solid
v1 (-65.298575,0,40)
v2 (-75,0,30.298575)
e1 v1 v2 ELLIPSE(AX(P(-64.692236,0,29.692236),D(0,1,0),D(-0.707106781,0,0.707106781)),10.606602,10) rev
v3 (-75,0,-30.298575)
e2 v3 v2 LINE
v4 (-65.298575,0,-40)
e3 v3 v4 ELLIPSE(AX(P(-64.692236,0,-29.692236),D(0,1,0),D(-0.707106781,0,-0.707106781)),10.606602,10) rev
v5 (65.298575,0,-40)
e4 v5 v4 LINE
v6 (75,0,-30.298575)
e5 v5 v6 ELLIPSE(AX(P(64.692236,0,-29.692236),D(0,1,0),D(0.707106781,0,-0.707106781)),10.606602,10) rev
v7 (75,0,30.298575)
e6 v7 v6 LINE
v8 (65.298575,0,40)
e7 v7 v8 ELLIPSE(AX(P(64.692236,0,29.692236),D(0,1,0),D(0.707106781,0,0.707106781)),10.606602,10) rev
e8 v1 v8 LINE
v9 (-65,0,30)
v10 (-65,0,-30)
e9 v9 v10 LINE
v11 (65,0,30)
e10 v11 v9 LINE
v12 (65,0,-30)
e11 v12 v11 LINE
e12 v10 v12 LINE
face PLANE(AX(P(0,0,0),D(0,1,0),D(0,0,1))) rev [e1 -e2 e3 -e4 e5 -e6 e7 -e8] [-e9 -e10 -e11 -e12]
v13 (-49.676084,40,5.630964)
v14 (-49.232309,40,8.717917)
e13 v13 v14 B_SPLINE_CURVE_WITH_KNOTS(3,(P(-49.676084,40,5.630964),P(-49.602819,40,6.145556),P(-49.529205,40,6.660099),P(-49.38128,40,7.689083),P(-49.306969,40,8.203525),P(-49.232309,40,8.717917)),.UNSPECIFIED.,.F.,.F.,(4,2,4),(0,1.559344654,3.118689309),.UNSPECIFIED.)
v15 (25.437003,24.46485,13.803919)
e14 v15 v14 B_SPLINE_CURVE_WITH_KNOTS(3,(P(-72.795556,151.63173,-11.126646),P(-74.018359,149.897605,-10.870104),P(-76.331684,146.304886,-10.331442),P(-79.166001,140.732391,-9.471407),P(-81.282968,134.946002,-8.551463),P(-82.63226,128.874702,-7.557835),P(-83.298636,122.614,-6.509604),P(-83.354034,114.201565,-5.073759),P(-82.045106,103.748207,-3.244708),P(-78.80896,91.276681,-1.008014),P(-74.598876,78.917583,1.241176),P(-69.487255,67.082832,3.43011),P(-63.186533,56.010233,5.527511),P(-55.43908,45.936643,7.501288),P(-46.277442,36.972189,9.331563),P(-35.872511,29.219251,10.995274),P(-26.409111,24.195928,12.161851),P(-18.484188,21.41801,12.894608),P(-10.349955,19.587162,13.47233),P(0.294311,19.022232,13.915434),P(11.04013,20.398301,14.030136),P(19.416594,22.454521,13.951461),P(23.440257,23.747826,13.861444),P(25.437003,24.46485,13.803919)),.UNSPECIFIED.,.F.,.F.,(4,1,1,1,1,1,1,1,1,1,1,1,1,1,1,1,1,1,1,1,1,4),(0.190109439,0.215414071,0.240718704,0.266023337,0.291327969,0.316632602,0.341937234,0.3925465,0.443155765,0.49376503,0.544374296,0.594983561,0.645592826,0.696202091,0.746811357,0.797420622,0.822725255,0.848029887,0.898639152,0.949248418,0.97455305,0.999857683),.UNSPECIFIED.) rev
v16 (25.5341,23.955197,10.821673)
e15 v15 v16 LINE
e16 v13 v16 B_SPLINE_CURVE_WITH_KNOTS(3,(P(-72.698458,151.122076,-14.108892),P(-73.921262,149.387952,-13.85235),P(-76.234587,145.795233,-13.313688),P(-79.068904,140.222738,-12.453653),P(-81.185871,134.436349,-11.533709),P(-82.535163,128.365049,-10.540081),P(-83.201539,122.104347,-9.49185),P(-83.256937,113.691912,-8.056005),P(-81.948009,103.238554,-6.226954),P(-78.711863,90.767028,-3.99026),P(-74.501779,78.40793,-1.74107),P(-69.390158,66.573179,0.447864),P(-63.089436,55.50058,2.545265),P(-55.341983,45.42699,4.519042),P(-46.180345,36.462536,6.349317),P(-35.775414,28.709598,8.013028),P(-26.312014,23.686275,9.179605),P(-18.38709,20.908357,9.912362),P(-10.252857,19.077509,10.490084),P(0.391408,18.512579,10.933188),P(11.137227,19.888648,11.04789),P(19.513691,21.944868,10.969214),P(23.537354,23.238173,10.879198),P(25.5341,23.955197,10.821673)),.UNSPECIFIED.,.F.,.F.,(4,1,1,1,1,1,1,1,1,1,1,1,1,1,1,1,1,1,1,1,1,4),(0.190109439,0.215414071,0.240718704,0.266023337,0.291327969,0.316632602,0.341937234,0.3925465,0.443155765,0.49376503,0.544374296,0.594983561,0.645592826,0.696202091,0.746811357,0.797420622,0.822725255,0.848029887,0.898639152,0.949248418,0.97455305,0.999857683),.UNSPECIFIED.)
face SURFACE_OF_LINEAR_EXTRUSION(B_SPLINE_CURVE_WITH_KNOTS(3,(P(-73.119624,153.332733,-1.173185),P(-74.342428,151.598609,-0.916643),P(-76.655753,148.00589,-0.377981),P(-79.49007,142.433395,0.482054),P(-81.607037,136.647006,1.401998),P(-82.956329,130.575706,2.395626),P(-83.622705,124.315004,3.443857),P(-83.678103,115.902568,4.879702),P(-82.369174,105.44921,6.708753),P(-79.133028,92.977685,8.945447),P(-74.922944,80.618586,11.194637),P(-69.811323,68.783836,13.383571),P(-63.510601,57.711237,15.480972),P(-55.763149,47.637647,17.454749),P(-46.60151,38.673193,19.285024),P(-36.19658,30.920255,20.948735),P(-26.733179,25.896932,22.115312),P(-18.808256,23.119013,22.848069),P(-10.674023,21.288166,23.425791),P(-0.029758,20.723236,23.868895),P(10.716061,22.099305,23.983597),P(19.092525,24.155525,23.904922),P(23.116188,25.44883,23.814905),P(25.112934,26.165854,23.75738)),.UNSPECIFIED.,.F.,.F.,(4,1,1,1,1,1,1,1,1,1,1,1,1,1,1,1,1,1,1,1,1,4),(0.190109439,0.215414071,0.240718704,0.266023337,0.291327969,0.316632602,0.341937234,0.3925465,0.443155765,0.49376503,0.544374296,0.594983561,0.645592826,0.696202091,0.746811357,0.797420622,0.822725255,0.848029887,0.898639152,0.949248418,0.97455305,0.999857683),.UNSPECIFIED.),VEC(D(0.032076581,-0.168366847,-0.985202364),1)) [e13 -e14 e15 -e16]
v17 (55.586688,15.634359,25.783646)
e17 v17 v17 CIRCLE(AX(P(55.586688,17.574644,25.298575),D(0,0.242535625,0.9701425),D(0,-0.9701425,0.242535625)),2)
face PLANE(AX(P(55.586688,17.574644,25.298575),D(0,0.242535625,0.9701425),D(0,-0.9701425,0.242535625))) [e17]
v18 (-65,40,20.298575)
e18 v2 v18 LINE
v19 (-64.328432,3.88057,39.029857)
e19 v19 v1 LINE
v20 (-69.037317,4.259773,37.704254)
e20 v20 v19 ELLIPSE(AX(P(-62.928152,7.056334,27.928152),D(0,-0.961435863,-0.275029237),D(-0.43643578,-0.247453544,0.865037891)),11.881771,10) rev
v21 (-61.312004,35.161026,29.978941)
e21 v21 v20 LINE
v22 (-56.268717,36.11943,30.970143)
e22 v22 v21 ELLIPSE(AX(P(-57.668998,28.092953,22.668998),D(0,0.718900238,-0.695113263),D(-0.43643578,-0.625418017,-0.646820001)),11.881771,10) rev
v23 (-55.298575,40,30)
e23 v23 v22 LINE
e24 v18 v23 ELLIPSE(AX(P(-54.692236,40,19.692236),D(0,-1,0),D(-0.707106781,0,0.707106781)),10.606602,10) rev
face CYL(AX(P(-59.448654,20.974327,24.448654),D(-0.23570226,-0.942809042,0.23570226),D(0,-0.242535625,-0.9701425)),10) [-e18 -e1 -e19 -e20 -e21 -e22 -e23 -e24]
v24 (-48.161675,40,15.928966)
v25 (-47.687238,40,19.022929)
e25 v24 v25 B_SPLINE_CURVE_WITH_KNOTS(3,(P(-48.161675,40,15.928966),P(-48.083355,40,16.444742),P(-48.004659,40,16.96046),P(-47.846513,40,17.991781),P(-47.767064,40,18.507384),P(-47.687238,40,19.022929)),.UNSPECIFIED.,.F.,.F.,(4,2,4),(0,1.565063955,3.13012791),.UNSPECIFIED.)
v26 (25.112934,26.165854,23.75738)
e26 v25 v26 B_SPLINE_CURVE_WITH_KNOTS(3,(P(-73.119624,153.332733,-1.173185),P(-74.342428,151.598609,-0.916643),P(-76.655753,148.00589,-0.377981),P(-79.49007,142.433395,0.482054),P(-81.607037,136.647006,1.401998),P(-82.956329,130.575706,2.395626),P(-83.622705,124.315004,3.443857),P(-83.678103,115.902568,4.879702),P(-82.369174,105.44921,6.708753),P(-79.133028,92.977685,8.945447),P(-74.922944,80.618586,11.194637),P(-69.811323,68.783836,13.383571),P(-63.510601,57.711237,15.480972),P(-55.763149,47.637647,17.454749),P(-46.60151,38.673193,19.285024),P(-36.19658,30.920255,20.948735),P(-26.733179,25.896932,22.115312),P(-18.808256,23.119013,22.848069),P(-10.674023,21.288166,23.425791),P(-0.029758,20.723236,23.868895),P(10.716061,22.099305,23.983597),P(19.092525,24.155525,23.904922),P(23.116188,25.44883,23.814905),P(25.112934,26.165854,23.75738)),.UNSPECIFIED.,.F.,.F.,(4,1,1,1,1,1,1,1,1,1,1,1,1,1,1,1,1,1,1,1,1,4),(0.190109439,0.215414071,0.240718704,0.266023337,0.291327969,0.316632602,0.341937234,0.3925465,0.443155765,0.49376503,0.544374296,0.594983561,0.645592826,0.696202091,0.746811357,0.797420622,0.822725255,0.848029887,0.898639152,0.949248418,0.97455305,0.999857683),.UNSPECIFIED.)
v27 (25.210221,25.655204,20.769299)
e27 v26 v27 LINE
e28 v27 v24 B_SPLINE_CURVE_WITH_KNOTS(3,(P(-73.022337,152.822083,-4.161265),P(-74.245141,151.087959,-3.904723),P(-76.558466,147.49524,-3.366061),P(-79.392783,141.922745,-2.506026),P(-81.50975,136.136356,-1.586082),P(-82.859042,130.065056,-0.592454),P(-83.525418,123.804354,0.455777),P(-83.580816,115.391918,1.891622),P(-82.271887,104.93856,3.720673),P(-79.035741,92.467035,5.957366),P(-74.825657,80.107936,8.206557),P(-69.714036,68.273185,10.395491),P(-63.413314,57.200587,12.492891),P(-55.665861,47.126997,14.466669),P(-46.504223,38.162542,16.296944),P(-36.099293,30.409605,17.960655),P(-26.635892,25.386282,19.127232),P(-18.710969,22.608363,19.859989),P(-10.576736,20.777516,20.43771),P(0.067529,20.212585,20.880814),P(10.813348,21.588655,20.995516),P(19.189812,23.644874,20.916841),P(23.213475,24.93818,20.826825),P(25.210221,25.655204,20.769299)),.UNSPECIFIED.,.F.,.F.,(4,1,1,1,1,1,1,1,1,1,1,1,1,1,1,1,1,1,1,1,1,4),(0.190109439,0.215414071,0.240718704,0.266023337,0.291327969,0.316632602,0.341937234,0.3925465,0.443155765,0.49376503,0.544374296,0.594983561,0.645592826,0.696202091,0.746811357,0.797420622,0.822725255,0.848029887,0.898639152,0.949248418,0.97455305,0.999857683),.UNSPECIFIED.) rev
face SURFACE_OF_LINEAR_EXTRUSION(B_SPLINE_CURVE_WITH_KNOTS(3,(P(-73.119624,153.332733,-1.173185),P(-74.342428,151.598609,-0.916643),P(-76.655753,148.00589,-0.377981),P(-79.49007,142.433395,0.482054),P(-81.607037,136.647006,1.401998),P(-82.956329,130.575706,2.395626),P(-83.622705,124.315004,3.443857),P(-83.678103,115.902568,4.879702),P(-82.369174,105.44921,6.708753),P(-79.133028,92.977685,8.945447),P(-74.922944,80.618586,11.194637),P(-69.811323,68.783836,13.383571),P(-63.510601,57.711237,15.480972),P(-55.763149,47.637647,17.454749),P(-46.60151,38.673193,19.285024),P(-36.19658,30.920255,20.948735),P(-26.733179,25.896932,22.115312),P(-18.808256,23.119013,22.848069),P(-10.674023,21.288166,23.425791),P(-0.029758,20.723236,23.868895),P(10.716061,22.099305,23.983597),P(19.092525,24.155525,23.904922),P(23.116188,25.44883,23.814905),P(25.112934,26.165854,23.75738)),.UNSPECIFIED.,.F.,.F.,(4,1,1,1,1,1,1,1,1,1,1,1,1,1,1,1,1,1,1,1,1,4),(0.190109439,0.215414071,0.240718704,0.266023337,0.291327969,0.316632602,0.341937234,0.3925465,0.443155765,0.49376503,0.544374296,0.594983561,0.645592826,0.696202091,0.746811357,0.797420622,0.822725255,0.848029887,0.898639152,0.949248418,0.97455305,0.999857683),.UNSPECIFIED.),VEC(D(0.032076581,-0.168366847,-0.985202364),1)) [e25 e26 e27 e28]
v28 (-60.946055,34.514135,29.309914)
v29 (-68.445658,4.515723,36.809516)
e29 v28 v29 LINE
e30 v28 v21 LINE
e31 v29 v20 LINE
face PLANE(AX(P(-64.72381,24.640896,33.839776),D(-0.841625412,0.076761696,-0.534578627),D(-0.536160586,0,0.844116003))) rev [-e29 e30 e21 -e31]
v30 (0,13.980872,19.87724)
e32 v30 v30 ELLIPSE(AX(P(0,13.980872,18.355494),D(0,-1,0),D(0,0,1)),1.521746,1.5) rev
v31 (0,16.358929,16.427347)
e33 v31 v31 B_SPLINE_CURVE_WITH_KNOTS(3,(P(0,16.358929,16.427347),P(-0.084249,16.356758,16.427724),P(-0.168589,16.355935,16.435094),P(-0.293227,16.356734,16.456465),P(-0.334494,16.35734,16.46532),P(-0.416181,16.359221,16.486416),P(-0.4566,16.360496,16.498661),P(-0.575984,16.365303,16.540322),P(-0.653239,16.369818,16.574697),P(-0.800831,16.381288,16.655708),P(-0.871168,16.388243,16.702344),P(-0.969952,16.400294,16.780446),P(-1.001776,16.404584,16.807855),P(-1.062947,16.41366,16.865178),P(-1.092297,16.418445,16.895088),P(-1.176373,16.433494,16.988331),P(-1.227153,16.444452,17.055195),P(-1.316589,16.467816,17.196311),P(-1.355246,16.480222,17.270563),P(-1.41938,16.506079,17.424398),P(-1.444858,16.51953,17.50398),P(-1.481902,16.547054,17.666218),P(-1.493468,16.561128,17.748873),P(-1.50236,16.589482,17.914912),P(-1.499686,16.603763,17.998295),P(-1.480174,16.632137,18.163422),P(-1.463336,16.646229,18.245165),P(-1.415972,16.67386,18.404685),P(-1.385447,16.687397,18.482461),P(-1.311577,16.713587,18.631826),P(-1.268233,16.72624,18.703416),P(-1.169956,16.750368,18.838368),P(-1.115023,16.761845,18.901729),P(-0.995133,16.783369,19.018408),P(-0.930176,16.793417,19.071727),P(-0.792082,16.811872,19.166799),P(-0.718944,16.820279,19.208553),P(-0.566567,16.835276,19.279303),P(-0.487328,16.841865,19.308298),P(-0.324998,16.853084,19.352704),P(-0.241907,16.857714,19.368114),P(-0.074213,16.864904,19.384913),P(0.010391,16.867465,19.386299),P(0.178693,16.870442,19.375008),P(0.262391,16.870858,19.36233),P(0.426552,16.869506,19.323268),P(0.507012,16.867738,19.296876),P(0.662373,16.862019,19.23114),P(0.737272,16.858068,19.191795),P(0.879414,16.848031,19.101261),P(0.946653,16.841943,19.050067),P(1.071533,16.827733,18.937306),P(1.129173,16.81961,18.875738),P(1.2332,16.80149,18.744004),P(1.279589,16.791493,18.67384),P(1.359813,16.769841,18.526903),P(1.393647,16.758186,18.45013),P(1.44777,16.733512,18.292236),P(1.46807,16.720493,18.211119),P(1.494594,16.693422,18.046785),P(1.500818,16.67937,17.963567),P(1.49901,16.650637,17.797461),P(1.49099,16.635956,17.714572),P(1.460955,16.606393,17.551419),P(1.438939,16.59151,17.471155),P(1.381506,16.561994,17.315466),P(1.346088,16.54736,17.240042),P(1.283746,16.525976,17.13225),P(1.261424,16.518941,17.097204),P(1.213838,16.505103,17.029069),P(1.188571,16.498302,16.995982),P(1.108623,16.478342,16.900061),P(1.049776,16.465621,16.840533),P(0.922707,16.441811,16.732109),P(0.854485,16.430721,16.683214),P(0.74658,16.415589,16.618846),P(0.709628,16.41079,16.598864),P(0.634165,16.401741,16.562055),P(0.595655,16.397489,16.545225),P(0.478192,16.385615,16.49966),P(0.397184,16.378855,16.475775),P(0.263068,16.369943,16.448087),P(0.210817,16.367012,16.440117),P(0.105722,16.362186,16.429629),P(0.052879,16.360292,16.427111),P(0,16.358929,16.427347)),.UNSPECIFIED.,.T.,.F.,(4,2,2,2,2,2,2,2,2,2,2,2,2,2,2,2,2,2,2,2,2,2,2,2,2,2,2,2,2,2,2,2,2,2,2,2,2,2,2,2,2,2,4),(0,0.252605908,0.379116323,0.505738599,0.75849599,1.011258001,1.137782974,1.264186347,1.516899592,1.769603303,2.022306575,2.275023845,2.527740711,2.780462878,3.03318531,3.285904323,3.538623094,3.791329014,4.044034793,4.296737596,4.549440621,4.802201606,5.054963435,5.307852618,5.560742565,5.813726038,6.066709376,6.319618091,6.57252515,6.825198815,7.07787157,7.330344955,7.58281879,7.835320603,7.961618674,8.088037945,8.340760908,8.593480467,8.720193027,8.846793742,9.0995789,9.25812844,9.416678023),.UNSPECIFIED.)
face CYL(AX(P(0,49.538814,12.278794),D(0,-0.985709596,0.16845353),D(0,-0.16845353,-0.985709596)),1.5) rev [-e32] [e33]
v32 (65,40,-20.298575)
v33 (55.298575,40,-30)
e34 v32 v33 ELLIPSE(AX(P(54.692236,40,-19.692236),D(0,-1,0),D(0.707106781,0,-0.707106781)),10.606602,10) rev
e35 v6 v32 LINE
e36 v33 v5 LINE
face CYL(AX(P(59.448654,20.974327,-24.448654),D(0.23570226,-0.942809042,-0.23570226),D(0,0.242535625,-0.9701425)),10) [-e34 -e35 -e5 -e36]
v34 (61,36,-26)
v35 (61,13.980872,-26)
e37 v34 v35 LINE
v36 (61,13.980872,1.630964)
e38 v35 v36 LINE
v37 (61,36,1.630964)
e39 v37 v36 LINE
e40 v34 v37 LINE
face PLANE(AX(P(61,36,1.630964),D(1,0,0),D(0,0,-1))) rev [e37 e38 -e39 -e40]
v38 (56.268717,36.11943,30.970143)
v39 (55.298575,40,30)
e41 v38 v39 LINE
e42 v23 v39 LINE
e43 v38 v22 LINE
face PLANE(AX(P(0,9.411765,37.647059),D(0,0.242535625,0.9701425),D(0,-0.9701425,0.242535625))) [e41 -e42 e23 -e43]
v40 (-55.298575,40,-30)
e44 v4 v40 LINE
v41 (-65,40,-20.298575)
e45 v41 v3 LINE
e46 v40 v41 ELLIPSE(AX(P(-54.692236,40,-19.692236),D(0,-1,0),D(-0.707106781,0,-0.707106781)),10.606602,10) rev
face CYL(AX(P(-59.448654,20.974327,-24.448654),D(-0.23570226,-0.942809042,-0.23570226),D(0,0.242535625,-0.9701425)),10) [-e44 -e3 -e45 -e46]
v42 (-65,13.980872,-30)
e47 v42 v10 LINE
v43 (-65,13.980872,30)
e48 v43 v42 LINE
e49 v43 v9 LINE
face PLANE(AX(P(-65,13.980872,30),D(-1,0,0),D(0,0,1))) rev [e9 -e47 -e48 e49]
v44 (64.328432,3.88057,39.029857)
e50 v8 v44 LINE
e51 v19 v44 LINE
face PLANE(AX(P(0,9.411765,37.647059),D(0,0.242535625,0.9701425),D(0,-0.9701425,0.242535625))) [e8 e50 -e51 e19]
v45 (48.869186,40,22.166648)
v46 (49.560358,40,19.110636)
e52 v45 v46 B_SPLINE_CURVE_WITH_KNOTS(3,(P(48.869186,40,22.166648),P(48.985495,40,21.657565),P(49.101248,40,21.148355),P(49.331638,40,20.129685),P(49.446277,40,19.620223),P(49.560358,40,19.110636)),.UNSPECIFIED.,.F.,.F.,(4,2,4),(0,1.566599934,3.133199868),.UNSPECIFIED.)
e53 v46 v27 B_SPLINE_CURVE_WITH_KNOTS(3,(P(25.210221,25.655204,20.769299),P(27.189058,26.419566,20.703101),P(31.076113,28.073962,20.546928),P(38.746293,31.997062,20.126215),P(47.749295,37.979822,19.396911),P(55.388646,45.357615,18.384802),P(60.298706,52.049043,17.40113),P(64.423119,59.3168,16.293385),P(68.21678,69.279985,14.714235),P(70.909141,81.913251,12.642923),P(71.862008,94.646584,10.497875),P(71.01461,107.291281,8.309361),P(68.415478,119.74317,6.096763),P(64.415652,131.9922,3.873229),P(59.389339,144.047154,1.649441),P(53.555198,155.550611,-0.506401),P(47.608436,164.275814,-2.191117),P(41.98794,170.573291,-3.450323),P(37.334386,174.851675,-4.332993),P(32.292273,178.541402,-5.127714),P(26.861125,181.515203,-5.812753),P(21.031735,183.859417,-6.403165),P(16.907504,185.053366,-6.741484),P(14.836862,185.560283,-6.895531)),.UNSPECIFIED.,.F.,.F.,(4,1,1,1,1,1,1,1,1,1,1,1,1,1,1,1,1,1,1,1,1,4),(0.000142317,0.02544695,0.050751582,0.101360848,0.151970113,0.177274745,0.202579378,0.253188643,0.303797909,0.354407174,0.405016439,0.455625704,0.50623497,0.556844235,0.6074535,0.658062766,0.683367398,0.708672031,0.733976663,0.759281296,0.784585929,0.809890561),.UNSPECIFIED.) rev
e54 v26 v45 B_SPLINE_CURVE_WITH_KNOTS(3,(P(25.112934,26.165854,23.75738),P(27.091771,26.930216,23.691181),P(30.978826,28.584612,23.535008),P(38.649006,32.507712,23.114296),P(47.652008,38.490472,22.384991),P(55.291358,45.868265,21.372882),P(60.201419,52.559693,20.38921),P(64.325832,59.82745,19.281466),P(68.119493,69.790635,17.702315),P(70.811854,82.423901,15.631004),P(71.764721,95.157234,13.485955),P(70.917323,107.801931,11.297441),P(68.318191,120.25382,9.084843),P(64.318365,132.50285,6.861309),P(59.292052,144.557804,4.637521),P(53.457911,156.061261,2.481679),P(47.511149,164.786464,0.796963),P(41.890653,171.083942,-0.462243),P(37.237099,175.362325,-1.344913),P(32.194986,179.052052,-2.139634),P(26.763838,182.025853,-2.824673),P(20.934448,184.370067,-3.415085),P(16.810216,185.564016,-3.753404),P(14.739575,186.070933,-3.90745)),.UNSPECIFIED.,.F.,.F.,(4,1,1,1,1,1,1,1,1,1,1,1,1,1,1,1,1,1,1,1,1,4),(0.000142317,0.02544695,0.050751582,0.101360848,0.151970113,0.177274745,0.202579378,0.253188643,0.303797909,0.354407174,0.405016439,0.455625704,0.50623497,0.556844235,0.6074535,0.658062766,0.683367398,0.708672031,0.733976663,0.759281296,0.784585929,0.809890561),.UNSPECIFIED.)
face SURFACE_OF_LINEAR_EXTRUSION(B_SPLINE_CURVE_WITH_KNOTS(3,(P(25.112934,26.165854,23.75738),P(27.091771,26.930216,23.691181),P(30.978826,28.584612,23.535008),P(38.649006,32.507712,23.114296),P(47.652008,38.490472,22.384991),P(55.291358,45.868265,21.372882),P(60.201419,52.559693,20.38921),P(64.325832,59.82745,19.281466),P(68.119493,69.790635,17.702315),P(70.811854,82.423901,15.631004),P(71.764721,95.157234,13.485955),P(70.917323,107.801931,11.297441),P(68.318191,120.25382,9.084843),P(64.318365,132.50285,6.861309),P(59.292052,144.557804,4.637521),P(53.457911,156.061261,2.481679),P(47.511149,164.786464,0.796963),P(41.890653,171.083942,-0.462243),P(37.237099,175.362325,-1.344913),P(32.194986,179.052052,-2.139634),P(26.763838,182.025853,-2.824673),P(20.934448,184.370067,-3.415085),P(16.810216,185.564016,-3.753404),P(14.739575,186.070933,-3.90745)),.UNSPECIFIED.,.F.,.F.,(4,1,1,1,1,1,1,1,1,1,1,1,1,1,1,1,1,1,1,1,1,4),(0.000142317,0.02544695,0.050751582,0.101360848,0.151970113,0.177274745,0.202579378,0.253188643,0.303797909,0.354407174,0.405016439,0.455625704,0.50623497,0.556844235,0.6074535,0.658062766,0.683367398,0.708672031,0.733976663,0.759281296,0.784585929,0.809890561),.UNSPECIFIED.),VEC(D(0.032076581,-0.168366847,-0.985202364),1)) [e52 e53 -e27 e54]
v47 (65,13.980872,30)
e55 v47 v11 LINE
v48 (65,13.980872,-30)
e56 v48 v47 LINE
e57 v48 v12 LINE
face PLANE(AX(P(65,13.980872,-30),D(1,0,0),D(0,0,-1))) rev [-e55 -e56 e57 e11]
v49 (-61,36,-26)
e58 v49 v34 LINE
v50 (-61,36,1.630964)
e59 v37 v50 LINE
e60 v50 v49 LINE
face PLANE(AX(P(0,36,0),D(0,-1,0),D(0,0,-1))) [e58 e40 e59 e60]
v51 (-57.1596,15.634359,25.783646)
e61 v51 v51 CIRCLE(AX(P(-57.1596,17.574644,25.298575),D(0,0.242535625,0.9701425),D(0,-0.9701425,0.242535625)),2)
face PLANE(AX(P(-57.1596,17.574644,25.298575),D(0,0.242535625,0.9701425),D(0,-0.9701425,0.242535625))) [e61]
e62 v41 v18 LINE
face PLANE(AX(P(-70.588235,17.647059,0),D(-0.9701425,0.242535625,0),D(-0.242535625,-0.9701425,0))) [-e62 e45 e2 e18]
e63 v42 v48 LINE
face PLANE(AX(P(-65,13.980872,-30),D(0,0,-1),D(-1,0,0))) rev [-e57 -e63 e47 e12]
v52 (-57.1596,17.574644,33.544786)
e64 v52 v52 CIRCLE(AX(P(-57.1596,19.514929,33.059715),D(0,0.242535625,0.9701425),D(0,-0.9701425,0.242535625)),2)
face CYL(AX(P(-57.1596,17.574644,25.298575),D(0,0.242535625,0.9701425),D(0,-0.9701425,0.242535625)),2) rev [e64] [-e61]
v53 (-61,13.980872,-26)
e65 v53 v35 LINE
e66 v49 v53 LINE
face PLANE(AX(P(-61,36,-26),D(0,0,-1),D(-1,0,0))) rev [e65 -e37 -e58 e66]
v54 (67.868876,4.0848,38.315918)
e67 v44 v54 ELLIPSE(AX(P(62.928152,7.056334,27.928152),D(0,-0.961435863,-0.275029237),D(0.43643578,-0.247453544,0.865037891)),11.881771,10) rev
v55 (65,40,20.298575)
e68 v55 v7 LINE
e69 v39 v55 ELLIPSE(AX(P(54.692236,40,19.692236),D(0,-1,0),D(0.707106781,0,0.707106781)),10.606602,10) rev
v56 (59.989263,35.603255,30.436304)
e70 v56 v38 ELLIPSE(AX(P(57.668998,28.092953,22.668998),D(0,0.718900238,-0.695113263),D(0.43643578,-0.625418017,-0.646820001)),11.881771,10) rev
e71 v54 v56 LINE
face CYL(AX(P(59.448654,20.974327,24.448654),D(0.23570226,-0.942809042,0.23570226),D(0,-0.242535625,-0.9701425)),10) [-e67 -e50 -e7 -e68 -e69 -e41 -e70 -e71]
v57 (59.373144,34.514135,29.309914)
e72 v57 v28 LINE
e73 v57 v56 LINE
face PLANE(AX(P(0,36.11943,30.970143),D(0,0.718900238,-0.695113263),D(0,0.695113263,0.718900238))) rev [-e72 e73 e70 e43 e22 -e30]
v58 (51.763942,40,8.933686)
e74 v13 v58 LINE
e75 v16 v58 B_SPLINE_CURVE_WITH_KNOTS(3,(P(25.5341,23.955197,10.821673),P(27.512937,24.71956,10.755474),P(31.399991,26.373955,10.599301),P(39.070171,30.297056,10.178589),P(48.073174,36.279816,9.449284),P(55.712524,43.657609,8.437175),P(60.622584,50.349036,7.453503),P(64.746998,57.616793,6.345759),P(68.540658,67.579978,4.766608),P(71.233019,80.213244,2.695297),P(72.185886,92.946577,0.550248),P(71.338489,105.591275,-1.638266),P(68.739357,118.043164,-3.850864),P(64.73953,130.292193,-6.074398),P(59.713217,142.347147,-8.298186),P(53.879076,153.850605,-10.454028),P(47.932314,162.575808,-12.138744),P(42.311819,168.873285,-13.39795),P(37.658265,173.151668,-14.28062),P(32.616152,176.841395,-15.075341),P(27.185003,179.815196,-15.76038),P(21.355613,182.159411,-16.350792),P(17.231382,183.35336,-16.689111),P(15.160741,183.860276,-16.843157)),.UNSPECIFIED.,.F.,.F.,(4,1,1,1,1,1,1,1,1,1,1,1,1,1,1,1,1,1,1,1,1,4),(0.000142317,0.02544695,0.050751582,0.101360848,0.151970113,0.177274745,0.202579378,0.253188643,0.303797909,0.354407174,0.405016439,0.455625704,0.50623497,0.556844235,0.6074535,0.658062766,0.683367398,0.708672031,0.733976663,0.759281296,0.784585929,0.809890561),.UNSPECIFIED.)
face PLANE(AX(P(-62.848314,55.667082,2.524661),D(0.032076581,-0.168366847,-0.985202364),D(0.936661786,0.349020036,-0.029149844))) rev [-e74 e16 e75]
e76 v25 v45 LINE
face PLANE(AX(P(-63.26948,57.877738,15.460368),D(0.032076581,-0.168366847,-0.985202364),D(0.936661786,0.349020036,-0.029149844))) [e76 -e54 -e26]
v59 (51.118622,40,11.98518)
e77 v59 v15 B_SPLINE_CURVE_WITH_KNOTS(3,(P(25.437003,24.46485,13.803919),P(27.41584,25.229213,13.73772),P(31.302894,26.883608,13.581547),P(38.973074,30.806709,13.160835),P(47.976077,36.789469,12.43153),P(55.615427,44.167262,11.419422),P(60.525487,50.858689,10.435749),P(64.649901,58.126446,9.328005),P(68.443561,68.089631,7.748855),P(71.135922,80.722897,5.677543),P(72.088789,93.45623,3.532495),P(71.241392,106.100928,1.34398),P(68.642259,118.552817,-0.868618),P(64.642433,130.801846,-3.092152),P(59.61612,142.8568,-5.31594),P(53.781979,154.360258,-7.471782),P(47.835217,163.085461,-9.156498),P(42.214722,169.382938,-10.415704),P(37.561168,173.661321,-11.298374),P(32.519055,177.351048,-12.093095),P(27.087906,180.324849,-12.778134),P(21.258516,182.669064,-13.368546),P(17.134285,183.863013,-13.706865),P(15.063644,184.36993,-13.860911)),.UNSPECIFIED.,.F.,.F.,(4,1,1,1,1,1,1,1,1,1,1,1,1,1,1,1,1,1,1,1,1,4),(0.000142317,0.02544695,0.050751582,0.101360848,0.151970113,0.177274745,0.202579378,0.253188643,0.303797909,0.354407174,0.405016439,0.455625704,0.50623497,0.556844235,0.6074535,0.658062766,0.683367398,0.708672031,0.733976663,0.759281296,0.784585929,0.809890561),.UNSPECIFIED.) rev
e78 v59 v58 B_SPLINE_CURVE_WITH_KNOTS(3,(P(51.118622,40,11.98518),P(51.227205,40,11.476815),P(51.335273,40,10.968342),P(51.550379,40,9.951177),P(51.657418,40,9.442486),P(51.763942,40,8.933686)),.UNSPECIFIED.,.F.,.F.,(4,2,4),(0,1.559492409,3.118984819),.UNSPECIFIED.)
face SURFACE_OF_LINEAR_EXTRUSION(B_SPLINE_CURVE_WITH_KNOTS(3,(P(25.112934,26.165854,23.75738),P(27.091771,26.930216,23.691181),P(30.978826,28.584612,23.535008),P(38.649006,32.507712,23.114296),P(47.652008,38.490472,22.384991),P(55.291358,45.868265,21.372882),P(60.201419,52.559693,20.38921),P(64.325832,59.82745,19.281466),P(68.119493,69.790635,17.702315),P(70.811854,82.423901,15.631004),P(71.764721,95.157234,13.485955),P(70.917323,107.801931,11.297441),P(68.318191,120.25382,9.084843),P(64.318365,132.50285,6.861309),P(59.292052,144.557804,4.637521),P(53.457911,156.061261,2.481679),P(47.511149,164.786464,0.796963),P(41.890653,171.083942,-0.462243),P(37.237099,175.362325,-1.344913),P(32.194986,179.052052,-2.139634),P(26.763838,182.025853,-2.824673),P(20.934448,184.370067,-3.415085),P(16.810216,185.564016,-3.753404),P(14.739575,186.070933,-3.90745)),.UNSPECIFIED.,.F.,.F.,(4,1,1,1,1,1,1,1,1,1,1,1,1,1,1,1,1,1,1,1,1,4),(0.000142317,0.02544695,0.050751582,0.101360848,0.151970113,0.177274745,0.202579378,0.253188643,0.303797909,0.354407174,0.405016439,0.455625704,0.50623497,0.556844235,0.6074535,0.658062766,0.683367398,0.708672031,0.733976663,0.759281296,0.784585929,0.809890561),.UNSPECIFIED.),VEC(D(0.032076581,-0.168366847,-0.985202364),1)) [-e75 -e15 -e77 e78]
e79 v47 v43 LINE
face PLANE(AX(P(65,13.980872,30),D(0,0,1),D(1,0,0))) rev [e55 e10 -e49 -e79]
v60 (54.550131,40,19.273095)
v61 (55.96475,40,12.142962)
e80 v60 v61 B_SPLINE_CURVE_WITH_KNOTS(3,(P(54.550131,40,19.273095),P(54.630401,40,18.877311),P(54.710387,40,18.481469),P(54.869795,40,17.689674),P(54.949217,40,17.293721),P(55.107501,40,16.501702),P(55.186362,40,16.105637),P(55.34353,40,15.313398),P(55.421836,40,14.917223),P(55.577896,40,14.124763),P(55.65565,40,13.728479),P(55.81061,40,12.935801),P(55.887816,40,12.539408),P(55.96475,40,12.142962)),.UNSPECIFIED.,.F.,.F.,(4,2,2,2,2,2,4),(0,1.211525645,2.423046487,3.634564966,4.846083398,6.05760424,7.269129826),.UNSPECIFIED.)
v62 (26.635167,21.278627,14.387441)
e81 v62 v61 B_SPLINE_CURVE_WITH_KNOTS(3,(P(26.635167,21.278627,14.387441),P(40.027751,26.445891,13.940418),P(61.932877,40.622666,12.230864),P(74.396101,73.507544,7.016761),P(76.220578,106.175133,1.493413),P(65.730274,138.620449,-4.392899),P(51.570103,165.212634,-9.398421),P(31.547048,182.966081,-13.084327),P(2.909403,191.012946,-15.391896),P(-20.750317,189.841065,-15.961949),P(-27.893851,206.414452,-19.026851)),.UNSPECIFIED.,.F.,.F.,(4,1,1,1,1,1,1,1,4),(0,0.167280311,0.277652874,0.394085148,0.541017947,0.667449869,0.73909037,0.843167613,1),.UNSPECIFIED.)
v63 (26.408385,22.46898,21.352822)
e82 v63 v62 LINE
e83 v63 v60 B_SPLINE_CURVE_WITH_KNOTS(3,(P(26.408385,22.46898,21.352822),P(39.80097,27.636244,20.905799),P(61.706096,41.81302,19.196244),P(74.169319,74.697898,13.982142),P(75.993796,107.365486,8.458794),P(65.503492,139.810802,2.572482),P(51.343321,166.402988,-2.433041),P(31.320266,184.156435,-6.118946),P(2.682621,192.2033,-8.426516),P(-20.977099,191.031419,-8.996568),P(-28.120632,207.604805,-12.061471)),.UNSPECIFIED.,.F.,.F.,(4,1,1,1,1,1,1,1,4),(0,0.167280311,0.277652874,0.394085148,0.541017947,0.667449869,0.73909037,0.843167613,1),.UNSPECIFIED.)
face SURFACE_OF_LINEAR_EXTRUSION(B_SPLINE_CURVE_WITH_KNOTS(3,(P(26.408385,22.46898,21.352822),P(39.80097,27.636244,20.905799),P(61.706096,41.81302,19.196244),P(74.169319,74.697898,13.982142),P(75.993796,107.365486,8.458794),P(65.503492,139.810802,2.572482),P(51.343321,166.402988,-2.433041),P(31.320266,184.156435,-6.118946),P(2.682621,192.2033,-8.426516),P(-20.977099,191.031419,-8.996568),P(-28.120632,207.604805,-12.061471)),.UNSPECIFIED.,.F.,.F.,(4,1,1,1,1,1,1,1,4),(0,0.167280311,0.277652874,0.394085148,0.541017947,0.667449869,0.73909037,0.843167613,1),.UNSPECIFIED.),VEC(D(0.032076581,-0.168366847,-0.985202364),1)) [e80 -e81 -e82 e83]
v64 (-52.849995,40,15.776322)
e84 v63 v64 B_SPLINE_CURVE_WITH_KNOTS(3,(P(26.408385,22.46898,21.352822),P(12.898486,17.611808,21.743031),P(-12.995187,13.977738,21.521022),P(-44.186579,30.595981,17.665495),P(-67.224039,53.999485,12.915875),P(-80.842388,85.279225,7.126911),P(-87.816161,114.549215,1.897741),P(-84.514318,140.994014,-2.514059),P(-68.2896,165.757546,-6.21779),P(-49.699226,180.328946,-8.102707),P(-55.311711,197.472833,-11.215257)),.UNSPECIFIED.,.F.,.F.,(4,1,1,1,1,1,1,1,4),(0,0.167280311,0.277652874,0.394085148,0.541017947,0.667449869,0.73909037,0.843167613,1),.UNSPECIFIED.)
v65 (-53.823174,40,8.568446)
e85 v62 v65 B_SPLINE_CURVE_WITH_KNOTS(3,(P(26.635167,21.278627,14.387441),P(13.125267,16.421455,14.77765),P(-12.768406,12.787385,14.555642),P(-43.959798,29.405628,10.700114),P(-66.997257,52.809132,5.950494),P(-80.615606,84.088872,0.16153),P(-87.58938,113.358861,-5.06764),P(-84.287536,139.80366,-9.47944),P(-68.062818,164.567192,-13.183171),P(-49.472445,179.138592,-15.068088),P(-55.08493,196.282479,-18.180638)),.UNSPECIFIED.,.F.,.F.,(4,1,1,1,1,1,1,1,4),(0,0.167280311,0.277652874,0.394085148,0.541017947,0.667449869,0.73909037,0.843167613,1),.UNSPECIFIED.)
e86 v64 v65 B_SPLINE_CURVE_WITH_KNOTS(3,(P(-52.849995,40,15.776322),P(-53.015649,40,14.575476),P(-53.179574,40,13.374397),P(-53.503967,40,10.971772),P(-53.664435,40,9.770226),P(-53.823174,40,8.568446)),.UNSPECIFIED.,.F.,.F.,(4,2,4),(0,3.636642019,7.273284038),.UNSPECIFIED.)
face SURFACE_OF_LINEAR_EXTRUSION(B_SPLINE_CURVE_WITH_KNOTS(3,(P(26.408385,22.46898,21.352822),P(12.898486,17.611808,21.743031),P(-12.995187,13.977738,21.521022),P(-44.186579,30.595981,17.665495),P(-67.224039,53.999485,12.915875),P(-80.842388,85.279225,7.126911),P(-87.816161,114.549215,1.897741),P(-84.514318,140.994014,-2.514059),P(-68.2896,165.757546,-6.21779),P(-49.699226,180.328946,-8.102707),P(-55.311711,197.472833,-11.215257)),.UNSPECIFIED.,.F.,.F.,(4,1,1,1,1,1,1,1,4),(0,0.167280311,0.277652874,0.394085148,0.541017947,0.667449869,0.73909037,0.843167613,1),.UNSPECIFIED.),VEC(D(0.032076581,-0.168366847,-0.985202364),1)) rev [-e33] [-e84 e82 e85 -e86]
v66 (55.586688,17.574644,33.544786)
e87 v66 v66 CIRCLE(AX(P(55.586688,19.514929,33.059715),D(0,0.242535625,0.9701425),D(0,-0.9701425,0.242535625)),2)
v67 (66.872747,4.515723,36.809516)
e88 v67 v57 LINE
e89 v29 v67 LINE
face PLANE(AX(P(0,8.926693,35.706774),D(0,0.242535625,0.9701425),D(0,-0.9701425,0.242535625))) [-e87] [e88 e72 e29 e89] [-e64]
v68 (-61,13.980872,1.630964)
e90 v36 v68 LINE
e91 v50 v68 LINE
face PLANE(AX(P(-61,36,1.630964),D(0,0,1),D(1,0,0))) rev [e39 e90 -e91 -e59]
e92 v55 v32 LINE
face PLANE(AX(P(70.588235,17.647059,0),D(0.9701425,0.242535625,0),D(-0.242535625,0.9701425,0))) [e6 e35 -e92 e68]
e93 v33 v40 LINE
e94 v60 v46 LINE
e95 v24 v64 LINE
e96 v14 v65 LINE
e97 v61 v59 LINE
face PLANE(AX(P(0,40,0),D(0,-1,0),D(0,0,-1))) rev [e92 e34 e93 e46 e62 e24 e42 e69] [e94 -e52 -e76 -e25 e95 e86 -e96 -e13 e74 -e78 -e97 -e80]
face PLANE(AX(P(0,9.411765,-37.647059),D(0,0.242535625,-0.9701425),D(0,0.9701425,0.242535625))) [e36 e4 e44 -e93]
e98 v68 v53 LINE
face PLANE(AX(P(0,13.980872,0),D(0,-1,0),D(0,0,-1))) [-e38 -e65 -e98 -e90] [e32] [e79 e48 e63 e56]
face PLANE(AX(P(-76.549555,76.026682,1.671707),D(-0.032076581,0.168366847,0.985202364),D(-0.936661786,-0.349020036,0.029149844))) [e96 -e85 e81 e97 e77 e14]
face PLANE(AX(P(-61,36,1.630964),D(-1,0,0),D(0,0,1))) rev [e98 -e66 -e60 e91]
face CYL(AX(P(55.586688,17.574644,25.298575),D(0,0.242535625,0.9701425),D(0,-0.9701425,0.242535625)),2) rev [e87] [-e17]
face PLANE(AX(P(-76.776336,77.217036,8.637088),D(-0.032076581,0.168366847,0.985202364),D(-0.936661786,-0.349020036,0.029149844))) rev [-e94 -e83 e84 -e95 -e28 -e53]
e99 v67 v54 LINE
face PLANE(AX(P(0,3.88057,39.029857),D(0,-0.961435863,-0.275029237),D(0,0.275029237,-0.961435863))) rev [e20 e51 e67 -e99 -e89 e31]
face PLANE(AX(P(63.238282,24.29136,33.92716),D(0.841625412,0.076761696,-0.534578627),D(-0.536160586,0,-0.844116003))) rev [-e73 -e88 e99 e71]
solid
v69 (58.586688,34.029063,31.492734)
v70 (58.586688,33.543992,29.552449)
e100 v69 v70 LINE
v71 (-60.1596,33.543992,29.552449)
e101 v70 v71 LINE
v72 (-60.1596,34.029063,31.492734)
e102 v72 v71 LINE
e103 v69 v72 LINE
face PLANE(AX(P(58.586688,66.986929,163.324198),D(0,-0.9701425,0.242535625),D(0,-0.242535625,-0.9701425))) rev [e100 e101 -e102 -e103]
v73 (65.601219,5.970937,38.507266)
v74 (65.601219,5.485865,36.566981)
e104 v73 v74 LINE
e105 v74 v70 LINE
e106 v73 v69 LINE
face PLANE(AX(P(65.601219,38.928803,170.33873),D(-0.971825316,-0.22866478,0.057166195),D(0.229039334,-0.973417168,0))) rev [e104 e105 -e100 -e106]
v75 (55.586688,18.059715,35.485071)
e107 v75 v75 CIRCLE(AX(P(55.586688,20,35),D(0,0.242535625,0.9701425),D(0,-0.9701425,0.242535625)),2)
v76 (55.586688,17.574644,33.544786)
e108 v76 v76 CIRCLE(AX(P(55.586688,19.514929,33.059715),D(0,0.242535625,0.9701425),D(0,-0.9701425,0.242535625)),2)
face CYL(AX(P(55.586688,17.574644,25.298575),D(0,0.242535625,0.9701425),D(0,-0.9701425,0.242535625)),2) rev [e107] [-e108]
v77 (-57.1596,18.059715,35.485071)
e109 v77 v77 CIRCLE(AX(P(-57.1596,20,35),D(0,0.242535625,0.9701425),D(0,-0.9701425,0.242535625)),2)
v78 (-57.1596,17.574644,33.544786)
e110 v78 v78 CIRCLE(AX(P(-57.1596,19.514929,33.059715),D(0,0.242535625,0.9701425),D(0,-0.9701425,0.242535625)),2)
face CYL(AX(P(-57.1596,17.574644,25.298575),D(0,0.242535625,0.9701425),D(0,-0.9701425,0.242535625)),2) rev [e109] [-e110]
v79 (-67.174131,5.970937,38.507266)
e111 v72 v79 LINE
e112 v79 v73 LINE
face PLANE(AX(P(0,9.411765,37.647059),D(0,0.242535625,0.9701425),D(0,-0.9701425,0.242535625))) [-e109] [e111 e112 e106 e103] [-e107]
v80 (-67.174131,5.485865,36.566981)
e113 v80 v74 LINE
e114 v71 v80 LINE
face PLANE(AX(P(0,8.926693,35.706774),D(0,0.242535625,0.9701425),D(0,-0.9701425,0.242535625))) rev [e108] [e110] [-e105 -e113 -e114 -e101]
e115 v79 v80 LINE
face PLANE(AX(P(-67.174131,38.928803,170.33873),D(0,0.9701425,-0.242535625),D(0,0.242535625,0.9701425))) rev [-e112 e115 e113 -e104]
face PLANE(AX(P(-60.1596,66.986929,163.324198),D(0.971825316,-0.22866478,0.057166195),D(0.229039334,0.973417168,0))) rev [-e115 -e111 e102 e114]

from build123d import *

# Parameters (mm, degrees)
CUT_EXTRUDE8_DEPTH  = 2
CUT_EXTRUDE8_DRAFT  = -30.000000000000068
CAVITY1_START       = -27.005751745
CAVITY1_DEPTH       = 13.13
CAVITY1_START_2     = -23.972790864
CAVITY1_2_DEPTH     = 7.07
CUT_EXTRUDE11_DEPTH = 13.980872
CUT_EXTRUDE12_DEPTH = 22.019128
CAVITY2_START       = 8.727473307
CAVITY2_OUTLINE_R   = 1.5
CAVITY2_DEPTH       = 10.107211823
BOSS_EXTRUDE1_DEPTH = 2
FILLET1_R           = 10
SKETCH14_R          = 2.0000000000000027
CUT_EXTRUDE16_DEPTH = 10


with BuildPart() as part:
    # Sketch2 → Loft1 section 0
    with BuildSketch(Plane(origin=(0, 40, 0), x_dir=(1, 0, 0), z_dir=(0, 1, 0))):
        with BuildLine():
            Line((-64.99999999999999, 30), (-64.99999999999999, -30))
            Line((-64.99999999999999, -30), (65.00000000000001, -30.000000000000007))
            Line((65.00000000000001, -30.000000000000007), (65.00000000000003, 30))
            Line((65.00000000000003, 30), (-64.99999999999999, 30))
        make_face()
    # Sketch1 → Loft1 section 1
    with BuildSketch(Plane(origin=(0, 0, 0), x_dir=(1, 0, 0), z_dir=(0, 1, 0))):
        with BuildLine():
            Line((-74.99999999999999, 40), (75.00000000000001, 40))
            Line((75.00000000000001, 40), (75.00000000000001, -40))
            Line((75.00000000000001, -40), (-74.99999999999999, -40))
            Line((-74.99999999999999, -40), (-74.99999999999999, 40))
        make_face()
    loft()


with BuildPart() as cut_extrude8_tool:
    # Sketch3 → Cut-Extrude8 (with draft: the straight prism first)
    with BuildSketch(Plane(origin=(0, 9.411764705882353, 37.64705882352941), x_dir=(1, 0, 0), z_dir=(0, 0.24253562503633302, 0.9701425001453319))):
        Polygon((-69.91389145643446, -5.701425001453311), (68.34097968479703, -5.701425001453311), (60.2812646850877, 27.529631254723288), (-61.85417645672512, 27.529631254723288), align=None)
    extrude(amount=-CUT_EXTRUDE8_DEPTH)
    # Cut-Extrude8: the draft: its side faces are tilted about the plane it starts from
    cut_extrude8_sides = [cut_extrude8_tool.faces().sort_by_distance(p)[0] for p in [
        (-0.786455886, 3.638034376, 38.059715),
        (64.311122185, 19.757464375, 34.0298575),
        (-0.786455886, 35.876894374, 30),
        (-65.884033957, 19.757464375, 34.0298575),
    ]]
    draft(cut_extrude8_sides, Plane(origin=(0, 9.411764705882353, 37.64705882352941), x_dir=(1, 0, 0), z_dir=(0, 0.24253562503633302, 0.9701425001453319)), CUT_EXTRUDE8_DRAFT)


with BuildPart() as part_1:
    add(part.part)

    # Cut-Extrude8: cut by cut_extrude8_tool
    add(cut_extrude8_tool.part, mode=Mode.SUBTRACT)

    # Cavity1: read off the stored shape, not the designer's step
    # Cavity1 outline → Cavity1 (cut)
    with BuildSketch(Plane(origin=(0, 0, 0), x_dir=(0.9994854140769153, 0.005403413308691594, 0.03161819368833113), z_dir=(0.032076580982039964, -0.16836684655668904, -0.9852023639501983)).offset(CAVITY1_START)):
        with BuildLine():
            add(Edge.make_bspline(
                [(50.355235298, -36.209129734), (50.805312989652776, -36.60371201438724), (51.24948658178987, -37.00382899801401), (51.687403264, -37.409437974)],
                knots=[0.11211566120277261, 0.11211566120277261, 0.11211566120277261, 0.11211566120277261, 0.1192150960387556, 0.1192150960387556, 0.1192150960387556, 0.1192150960387556], degree=3))
            add(Edge.make_bspline(
                [(49.761044253, -35.694333688), (49.96021870095069, -35.864870240989205), (50.158292235749954, -36.036470115873016), (50.355235298, -36.209129734)],
                knots=[0.10900912101711563, 0.10900912101711563, 0.10900912101711563, 0.10900912101711563, 0.11211566120248272, 0.11211566120248272, 0.11211566120248272, 0.11211566120248272], degree=3))
            Line((49.761044253, -35.694333688), (-46.845091182, -36.223904348))
            add(Edge.make_bspline(
                [(-47.417110338, -36.745093263), (-47.22719353968011, -36.57064858623464), (-47.03651846748558, -36.39691770953557), (-46.845091182, -36.223904348)],
                knots=[0.6864352775247219, 0.6864352775247219, 0.6864352775247219, 0.6864352775247219, 0.6894561696163187, 0.6894561696163187, 0.6894561696163187, 0.6894561696163187], degree=3))
            add(Edge.make_bspline(
                [(-48.715193267, -37.959819881), (-48.28655788769419, -37.55116650190169), (-47.853839012104416, -37.14624257172727), (-47.417110338, -36.745093263)],
                knots=[0.6794884976438031, 0.6794884976438031, 0.6794884976438031, 0.6794884976438031, 0.6864352775247208, 0.6864352775247208, 0.6864352775247208, 0.6864352775247208], degree=3))
            add(Edge.make_bspline(
                [(-49.256344045, -38.4798281), (-49.07669321747152, -38.3058284511273), (-48.89630777162405, -38.1324912420223), (-48.715193267, -37.959819881)],
                knots=[0.6765532229119626, 0.6765532229119626, 0.6765532229119626, 0.6765532229119626, 0.6794884976438018, 0.6794884976438018, 0.6794884976438018, 0.6794884976438018], degree=3))
            Line((-49.256344045, -38.4798281), (52.235908996, -37.92347297))
            add(Edge.make_bspline(
                [(51.687403264, -37.409437974), (51.87135121860002, -37.57981499870691), (52.05419517867322, -37.751161052615934), (52.235908996, -37.92347297)],
                knots=[0.11921509604045627, 0.11921509604045627, 0.11921509604045627, 0.11921509604045627, 0.12219723070068893, 0.12219723070068893, 0.12219723070068893, 0.12219723070068893], degree=3))
        make_face()
        with BuildLine():
            Line((-46.845091182, -36.223904348), (49.761044253, -35.694333688))
            add(Edge.make_bspline(
                [(25.992562022, -21.789918914), (27.97241774927912, -22.554509718421677), (31.86147330768567, -24.21157111866771), (39.53560235227695, -28.149479207087097), (45.484692945993835, -32.12546362556011), (49.27067858554398, -35.27447425551093), (49.761044253, -35.694333688)],
                knots=[0.00014231695830879, 0.00014231695830879, 0.00014231695830879, 0.00014231695830879, 0.0254469495955715, 0.0507515822328341, 0.101360847507359, 0.10900912101711563, 0.10900912101711563, 0.10900912101711563, 0.10900912101711563], degree=3))
            add(Edge.make_bspline(
                [(-46.845091182, -36.223904348), (-46.417616962089184, -35.837550063290415), (-42.751252764049724, -32.583109122216364), (-35.3485175182261, -26.949503677086305), (-25.880244562699968, -21.801451670333996), (-17.951241239258827, -18.93979547800609), (-9.812820325211526, -17.037792218072678), (0.8369249515851553, -16.406292550348134), (11.588276700291972, -17.743375586597505), (19.969053301580413, -19.783463884974942), (23.99478785870199, -21.07345105396366), (25.992562022, -21.789918914)],
                knots=[0.6894561696163187, 0.6894561696163187, 0.6894561696163187, 0.6894561696163187, 0.696202091394543, 0.746811356669069, 0.797420621943594, 0.822725254580857, 0.84802988721812, 0.898639152492646, 0.949248417767171, 0.974553050404434, 0.999857683041697, 0.999857683041697, 0.999857683041697, 0.999857683041697], degree=3))
        make_face()
    extrude(amount=CAVITY1_DEPTH, mode=Mode.SUBTRACT)

    # Cavity1 2 outline → Cavity1 2 (cut)
    with BuildSketch(Plane(origin=(0, 0, 0), x_dir=(0.9994854140769153, 0.005403413308691594, 0.03161819368833113), z_dir=(0.032076580982039964, -0.16836684655668904, -0.9852023639501983)).offset(CAVITY1_START_2)):
        with BuildLine():
            add(Edge.make_bspline(
                [(27.191342809, -18.550931312), (37.35377153585318, -22.470993201582978), (47.403872591056825, -28.360509477424444), (55.347576783, -36.181762968)],
                knots=[0, 0, 0, 0, 0.12686867431457954, 0.12686867431457954, 0.12686867431457954, 0.12686867431457954], degree=3))
            add(Edge.make_bspline(
                [(27.191342809, -18.550931312), (13.674487738389166, -13.697438126784096), (-12.232516906914503, -10.152698462282672), (-38.21904867543959, -24.333826303887037), (-48.959817642205, -33.642555584421366), (-52.107843822, -36.770806684)],
                knots=[0, 0, 0, 0, 0.167280310890927, 0.277652873911495, 0.3281558088454397, 0.3281558088454397, 0.3281558088454397, 0.3281558088454397], degree=3))
            Line((-52.107843822, -36.770806684), (-47.417110338, -36.745093263))
            add(Edge.make_bspline(
                [(-47.417110338, -36.745093263), (-47.22719353968011, -36.57064858623464), (-47.03651846748558, -36.39691770953557), (-46.845091182, -36.223904348)],
                knots=[0.6864352775247219, 0.6864352775247219, 0.6864352775247219, 0.6864352775247219, 0.6894561696163187, 0.6894561696163187, 0.6894561696163187, 0.6894561696163187], degree=3))
            add(Edge.make_bspline(
                [(-46.845091182, -36.223904348), (-46.417616962089184, -35.837550063290415), (-42.751252764049724, -32.583109122216364), (-35.3485175182261, -26.949503677086305), (-25.880244562699968, -21.801451670333996), (-17.951241239258827, -18.93979547800609), (-9.812820325211526, -17.037792218072678), (0.8369249515851553, -16.406292550348134), (11.588276700291972, -17.743375586597505), (19.969053301580413, -19.783463884974942), (23.99478785870199, -21.07345105396366), (25.992562022, -21.789918914)],
                knots=[0.6894561696163187, 0.6894561696163187, 0.6894561696163187, 0.6894561696163187, 0.696202091394543, 0.746811356669069, 0.797420621943594, 0.822725254580857, 0.84802988721812, 0.898639152492646, 0.949248417767171, 0.974553050404434, 0.999857683041697, 0.999857683041697, 0.999857683041697, 0.999857683041697], degree=3))
            add(Edge.make_bspline(
                [(25.992562022, -21.789918914), (27.97241774927912, -22.554509718421677), (31.86147330768567, -24.21157111866771), (39.53560235227695, -28.149479207087097), (45.484692945993835, -32.12546362556011), (49.27067858554398, -35.27447425551093), (49.761044253, -35.694333688)],
                knots=[0.00014231695830879, 0.00014231695830879, 0.00014231695830879, 0.00014231695830879, 0.0254469495955715, 0.0507515822328341, 0.101360847507359, 0.10900912101711563, 0.10900912101711563, 0.10900912101711563, 0.10900912101711563], degree=3))
            add(Edge.make_bspline(
                [(49.761044253, -35.694333688), (49.96021870095069, -35.864870240989205), (50.158292235749954, -36.036470115873016), (50.355235298, -36.209129734)],
                knots=[0.10900912101711563, 0.10900912101711563, 0.10900912101711563, 0.10900912101711563, 0.11211566120248272, 0.11211566120248272, 0.11211566120248272, 0.11211566120248272], degree=3))
            Line((50.355235298, -36.209129734), (55.347576783, -36.181762968))
        make_face()
        with BuildLine():
            add(Edge.make_bspline(
                [(55.347576783, -36.181762968), (55.74919687256925, -36.577192159097784), (56.145432715262274, -36.97755914211079), (56.53602661, -37.382859043)],
                knots=[0.1268686743145864, 0.1268686743145864, 0.1268686743145864, 0.1268686743145864, 0.13328293736502136, 0.13328293736502136, 0.13328293736502136, 0.13328293736502136], degree=3))
            Line((55.347576783, -36.181762968), (50.355235298, -36.209129734))
            add(Edge.make_bspline(
                [(50.355235298, -36.209129734), (50.805312989652776, -36.60371201438724), (51.24948658178987, -37.00382899801401), (51.687403264, -37.409437974)],
                knots=[0.11211566120277261, 0.11211566120277261, 0.11211566120277261, 0.11211566120277261, 0.1192150960387556, 0.1192150960387556, 0.1192150960387556, 0.1192150960387556], degree=3))
            Line((51.687403264, -37.409437974), (56.53602661, -37.382859043))
        make_face()
        with BuildLine():
            Line((-47.417110338, -36.745093263), (-52.107843823, -36.770806685))
            add(Edge.make_bspline(
                [(-52.107843823, -36.770806685), (-52.511739115098145, -37.17216481243256), (-52.91195079030909, -37.57691398832324), (-53.308422277, -37.984998807)],
                knots=[0.3281558088541084, 0.3281558088541084, 0.3281558088541084, 0.3281558088541084, 0.3346353920875178, 0.3346353920875178, 0.3346353920875178, 0.3346353920875178], degree=3))
            Line((-53.308422277, -37.984998807), (-48.715193267, -37.959819881))
            add(Edge.make_bspline(
                [(-48.715193267, -37.959819881), (-48.28655788769419, -37.55116650190169), (-47.853839012104416, -37.14624257172727), (-47.417110338, -36.745093263)],
                knots=[0.6794884976438031, 0.6794884976438031, 0.6794884976438031, 0.6794884976438031, 0.6864352775247208, 0.6864352775247208, 0.6864352775247208, 0.6864352775247208], degree=3))
        make_face()
    extrude(amount=CAVITY1_2_DEPTH, mode=Mode.SUBTRACT)

    # Sketch4 → Cut-Extrude11 (cut)
    with BuildSketch(Plane.XZ):
        Polygon((-64.99999999999999, -30), (65.00000000000003, -30), (65.00000000000001, 30.000000000000007), (-64.99999999999999, 30), align=None)
    extrude(amount=-CUT_EXTRUDE11_DEPTH, mode=Mode.SUBTRACT)

    # Sketch7 → Cut-Extrude12 (cut)
    with BuildSketch(Plane.XZ.offset(-13.980871517386877)):
        Polygon((-60.99999999999998, 1.630963903200694), (61.00000000000003, 1.630963903200694), (61.00000000000003, -26.000000000000007), (-60.999999999999986, -26.000000000000007), align=None)
    extrude(amount=-CUT_EXTRUDE12_DEPTH, mode=Mode.SUBTRACT)

    # Cavity2: read off the stored shape, not the designer's step
    # Cavity2 outline → Cavity2 (cut)
    with BuildSketch(Plane(origin=(0, 0, 0), x_dir=(1, 0, 0), z_dir=(0, 0.9857095962326692, -0.16845353037211303)).offset(CAVITY2_START)):
        with Locations((0, -20.448313278)):
            Circle(CAVITY2_OUTLINE_R)
    extrude(amount=CAVITY2_DEPTH, mode=Mode.SUBTRACT)

    # Fillet1
    # the kernel refuses this fillet: 10 mm, written as the material it takes off along each edge
    with BuildSketch(Plane(origin=(59.44444444444446, 62.222222222222214, 24.444444444444457), x_dir=(0.0571661950475022, -0.2286647801900118, -0.97182531580755), z_dir=(0.23570226039551587, -0.9428090415820635, 0.2357022603955157))) as fillet1_piece_1:
        with BuildLine():
            CenterArc((FILLET1_R * 0.942809041582, -FILLET1_R), FILLET1_R, 90.00000000000004, 86.62771331656596)
            Line((-FILLET1_R * 0.0554593553872, -FILLET1_R * 0.941176470588), (0, 0))
            Line((0, 0), (FILLET1_R * 0.942809041582, -1e-17))
        make_face()
    extrude(amount=89.56685895029601, mode=Mode.SUBTRACT)
    with BuildSketch(Plane(origin=(59.44444444444448, 62.22222222222224, -24.44444444444444), x_dir=(-0.9718253158075503, -0.2286647801900115, -0.05716619504750306), z_dir=(0.23570226039551553, -0.9428090415820635, -0.23570226039551587))) as fillet1_piece_2:
        with BuildLine():
            CenterArc((FILLET1_R * 0.942809041582, -FILLET1_R), FILLET1_R, 89.99999999999999, 86.6277133165661)
            Line((-FILLET1_R * 0.0554593553872, -FILLET1_R * 0.941176470588), (0, 0))
            Line((0, 0), (FILLET1_R * 0.942809041582, -3e-17))
        make_face()
    extrude(amount=89.56685895029607, mode=Mode.SUBTRACT)
    with BuildSketch(Plane(origin=(-59.44444444444442, 62.22222222222225, -24.444444444444436), x_dir=(-0.05716619504750242, -0.22866478019001193, 0.97182531580755), z_dir=(-0.23570226039551584, -0.9428090415820634, -0.23570226039551584))) as fillet1_piece_3:
        with BuildLine():
            CenterArc((FILLET1_R * 0.942809041582, -FILLET1_R), FILLET1_R, 90.00000000000004, 86.62771331656613)
            Line((-FILLET1_R * 0.0554593553872, -FILLET1_R * 0.941176470588), (0, 0))
            Line((0, 0), (FILLET1_R * 0.942809041582, 7e-17))
        make_face()
    extrude(amount=89.56685895029608, mode=Mode.SUBTRACT)
    with BuildSketch(Plane(origin=(-59.44444444444443, 62.22222222222223, 24.444444444444443), x_dir=(-0.05716619504750224, -0.228664780190012, -0.97182531580755), z_dir=(-0.23570226039551584, -0.9428090415820634, 0.23570226039551584))) as fillet1_piece_4:
        with BuildLine():
            CenterArc((FILLET1_R * 0.942809041582, FILLET1_R), FILLET1_R, 183.37228668343386, 86.62771331656609)
            Line((-FILLET1_R * 0.0554593553872, FILLET1_R * 0.941176470588), (0, 0))
            Line((0, 0), (FILLET1_R * 0.942809041582, -1.2e-16))
        make_face()
    extrude(amount=89.56685895029604, mode=Mode.SUBTRACT)


with BuildPart() as body_2:
    # Sketch10 → Boss-Extrude1 (new body)
    with BuildSketch(Plane(origin=(0, 8.926693455809687, 35.706773823238755), x_dir=(1, 0, 0), z_dir=(0, 0.242535625036333, 0.9701425001453319))):
        Polygon((-67.17413125216545, -3.5467244630740566), (65.60121948052803, -3.546724463074049), (58.58668776450257, 25.374930716344036), (-60.15959953614, 25.374930716344014), align=None)
    extrude(amount=BOSS_EXTRUDE1_DEPTH)


with BuildPart() as cut_extrude16_tool:
    # Sketch14 → Cut-Extrude16 (new body)
    with BuildSketch(Plane(origin=(0, 9.411764705882353, 37.64705882352941), x_dir=(1, 0, 0), z_dir=(0, 0.24253562503633302, 0.9701425001453319))):
        with Locations(Location((-57.15959953614, 10.91410312663499, 0), (0, 0, 270))):
            Circle(SKETCH14_R)
        with Locations(Location((55.58668776450257, 10.914103126634998, 0), (0, 0, 270))):
            Circle(SKETCH14_R)
    extrude(amount=-CUT_EXTRUDE16_DEPTH)


with BuildPart() as part_2:
    add(part_1.part)

    # Cut-Extrude16: cut by cut_extrude16_tool
    add(cut_extrude16_tool.part, mode=Mode.SUBTRACT)


with BuildPart() as body_2_1:
    add(body_2.part)

    # Cut-Extrude16: cut by cut_extrude16_tool
    add(cut_extrude16_tool.part, mode=Mode.SUBTRACT)


solid = Compound([part_2.part, body_2_1.part])
